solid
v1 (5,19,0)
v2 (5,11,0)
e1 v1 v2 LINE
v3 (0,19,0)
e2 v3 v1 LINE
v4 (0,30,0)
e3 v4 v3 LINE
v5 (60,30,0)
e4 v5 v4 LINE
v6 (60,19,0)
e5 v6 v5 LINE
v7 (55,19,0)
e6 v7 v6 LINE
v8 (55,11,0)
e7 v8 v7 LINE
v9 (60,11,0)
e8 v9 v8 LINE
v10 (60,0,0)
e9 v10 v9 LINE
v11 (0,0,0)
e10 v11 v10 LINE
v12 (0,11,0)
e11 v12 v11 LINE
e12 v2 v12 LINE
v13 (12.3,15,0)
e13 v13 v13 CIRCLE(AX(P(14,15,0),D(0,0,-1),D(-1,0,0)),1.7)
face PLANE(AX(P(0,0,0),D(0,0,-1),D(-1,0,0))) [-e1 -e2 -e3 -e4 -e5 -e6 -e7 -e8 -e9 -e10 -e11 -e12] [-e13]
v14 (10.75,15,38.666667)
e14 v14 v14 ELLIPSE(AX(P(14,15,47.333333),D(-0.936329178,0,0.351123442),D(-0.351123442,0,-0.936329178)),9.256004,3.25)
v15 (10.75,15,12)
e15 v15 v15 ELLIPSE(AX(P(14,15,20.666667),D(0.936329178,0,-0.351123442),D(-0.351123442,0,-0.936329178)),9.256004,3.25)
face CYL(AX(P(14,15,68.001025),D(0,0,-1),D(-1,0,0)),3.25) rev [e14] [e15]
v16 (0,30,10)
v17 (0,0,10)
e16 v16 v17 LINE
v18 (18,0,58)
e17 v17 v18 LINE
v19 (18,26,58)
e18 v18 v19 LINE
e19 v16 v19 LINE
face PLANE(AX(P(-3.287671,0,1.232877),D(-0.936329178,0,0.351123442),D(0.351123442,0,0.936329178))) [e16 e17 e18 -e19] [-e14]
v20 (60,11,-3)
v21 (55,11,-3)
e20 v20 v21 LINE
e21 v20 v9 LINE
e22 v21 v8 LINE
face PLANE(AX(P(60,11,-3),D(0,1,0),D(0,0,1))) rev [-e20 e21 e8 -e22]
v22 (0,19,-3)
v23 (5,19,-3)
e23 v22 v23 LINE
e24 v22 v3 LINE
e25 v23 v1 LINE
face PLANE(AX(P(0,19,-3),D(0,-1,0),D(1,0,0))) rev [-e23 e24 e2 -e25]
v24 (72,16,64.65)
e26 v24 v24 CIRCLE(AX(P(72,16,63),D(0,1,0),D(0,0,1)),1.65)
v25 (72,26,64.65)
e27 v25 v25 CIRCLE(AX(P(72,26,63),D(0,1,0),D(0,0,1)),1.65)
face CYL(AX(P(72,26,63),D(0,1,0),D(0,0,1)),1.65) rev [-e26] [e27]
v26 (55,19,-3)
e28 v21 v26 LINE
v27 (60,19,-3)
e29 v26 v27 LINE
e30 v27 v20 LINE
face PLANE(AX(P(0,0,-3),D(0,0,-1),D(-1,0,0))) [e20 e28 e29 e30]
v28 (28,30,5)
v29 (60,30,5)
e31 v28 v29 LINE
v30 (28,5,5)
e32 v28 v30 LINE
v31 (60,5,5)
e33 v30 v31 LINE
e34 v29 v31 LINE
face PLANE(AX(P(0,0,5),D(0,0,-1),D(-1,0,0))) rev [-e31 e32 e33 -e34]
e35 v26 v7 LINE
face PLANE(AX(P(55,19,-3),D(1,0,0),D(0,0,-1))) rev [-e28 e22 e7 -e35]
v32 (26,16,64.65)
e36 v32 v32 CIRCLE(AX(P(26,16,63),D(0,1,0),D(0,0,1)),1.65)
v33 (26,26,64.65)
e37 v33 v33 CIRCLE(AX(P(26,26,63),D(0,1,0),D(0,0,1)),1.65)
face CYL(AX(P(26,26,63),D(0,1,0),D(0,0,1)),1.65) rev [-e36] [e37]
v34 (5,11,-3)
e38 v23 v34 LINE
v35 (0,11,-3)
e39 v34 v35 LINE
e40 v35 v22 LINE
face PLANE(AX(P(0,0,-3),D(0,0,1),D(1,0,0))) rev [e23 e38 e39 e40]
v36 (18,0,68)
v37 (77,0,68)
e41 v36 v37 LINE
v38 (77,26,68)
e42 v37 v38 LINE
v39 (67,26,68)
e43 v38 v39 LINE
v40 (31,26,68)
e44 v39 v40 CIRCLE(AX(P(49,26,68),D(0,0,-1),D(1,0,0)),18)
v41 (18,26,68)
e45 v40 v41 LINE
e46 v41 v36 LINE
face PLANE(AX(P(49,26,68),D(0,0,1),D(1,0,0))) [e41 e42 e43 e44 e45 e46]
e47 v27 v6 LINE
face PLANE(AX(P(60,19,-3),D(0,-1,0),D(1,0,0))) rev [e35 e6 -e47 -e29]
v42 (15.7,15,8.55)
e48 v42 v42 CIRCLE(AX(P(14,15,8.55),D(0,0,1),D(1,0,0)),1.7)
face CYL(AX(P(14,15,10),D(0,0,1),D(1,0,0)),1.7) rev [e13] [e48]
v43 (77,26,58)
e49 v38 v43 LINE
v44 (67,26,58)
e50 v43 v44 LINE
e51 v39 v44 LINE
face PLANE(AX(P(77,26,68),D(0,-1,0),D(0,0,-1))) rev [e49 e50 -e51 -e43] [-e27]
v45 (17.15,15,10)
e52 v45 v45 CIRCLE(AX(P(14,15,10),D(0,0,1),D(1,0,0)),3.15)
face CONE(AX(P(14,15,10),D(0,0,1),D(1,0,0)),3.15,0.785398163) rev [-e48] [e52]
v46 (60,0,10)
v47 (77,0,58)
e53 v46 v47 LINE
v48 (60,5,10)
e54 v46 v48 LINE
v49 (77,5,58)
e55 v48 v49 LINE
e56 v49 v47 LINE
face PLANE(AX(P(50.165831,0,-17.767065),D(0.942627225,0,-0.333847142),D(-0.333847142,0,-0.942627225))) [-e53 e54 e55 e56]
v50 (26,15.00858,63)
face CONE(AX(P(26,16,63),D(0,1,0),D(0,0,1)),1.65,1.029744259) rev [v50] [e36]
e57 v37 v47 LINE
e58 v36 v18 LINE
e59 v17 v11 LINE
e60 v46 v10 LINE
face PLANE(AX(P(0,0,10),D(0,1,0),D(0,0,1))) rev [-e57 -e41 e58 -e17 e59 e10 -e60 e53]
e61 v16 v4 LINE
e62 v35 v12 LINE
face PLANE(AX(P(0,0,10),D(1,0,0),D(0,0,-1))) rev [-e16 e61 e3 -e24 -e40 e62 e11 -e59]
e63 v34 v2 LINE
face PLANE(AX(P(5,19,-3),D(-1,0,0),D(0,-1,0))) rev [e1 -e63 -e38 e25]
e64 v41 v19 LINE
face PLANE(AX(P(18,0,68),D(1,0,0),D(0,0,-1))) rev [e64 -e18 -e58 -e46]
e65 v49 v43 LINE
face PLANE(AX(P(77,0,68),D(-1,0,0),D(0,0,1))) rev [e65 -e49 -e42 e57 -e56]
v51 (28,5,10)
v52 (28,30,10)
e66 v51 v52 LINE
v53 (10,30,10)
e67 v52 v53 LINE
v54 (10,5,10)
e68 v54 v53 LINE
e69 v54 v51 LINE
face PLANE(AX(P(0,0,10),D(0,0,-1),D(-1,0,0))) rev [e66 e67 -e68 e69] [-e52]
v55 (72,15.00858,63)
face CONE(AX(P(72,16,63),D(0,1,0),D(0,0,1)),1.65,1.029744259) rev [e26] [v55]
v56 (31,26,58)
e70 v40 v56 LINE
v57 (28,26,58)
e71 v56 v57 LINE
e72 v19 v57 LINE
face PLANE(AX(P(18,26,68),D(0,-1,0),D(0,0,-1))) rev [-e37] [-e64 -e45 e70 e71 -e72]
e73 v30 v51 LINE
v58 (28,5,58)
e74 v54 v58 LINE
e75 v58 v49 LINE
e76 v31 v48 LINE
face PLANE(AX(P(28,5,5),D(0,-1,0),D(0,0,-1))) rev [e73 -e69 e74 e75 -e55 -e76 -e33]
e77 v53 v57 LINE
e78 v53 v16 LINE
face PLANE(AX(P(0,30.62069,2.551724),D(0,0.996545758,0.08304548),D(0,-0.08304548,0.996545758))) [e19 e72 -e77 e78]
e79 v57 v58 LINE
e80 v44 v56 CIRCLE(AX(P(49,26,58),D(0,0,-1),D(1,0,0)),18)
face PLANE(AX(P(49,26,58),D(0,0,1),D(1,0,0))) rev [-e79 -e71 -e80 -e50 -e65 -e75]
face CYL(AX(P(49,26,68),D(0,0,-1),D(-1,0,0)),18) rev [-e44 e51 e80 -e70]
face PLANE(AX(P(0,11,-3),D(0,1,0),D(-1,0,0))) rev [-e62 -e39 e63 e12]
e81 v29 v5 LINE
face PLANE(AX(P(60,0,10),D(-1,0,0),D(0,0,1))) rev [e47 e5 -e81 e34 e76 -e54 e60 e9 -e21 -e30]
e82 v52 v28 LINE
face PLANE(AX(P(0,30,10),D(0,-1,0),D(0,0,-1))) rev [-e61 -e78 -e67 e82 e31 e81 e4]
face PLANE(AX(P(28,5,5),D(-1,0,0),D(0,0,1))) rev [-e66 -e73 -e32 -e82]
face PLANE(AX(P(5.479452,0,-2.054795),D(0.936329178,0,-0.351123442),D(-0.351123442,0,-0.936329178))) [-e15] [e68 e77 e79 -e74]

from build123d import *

# Parameters (mm, degrees)
SKETCH_1_W          = 60
SKETCH_1_H          = 30
EXTRUDE_1_DEPTH     = 10
SKETCH_2_W          = 42
SKETCH_2_H          = 42
CUT_EXTRUDE_1_DEPTH = 5
EXTRUDE_2_DEPTH     = 10
CUT_EXTRUDE_2_REACH = 102.96
SKETCH_8_R          = 3.25
SKETCH_9_W          = 5
SKETCH_9_H          = 8
EXTRUDE_3_DEPTH     = 3


# Read off the part's stored shape, not the designer's step: 高级异型孔1, 高级异型孔2
with BuildPart() as part:
    # 草图1 → 凸台-拉伸1 (new body)
    with BuildSketch(Plane.XY):
        with Locations((30, 15)):
            Rectangle(SKETCH_1_W, SKETCH_1_H)
    extrude(amount=EXTRUDE_1_DEPTH)

    # 草图2 → 切除-拉伸1 (cut)
    with BuildSketch(Plane.XY.offset(10)):
        with Locations((49, 26)):
            Rectangle(SKETCH_2_W, SKETCH_2_H)
    extrude(amount=-CUT_EXTRUDE_1_DEPTH, mode=Mode.SUBTRACT)



with BuildPart() as body_2:
    # 草图3 → 凸台-拉伸2 (new body)
    with BuildSketch(Plane.XY.offset(58)):
        with BuildLine():
            Line((18, 0), (18, 26))
            Line((18, 26), (31, 26))
            ThreePointArc((31, 26), (49, 8), (67, 26))
            Line((67, 26), (77, 26))
            Line((77, 26), (77, 0))
            Line((77, 0), (18, 0))
        make_face()
    extrude(amount=EXTRUDE_2_DEPTH)


with BuildPart() as part_1:
    add(part.part)

    add(body_2.part)  # 放样1 merges body 2
    # 草图5 → 放样1 section 0
    with BuildSketch(Plane.XY.offset(10)):
        with BuildLine():
            Line((60, 5), (60, 0))
            Line((60, 0), (0, 0))
            Line((0, 0), (0, 30))
            Line((0, 30), (10, 30))
            Line((10, 30), (10, 5))
            Line((10, 5), (60, 5))
        make_face()
    # 草图4 → 放样1 section 1
    with BuildSketch(Plane(origin=(0, 0, 58), x_dir=(-1, 0, 0), z_dir=(0, 0, -1))):
        with BuildLine():
            Line((-18, 26), (-18, 0))
            Line((-18, 0), (-77, 0))
            Line((-77, 0), (-77, 5))
            Line((-77, 5), (-28, 5))
            Line((-28, 5), (-28, 26))
            Line((-28, 26), (-18, 26))
        make_face()
    loft()

    # 高级异型孔1 outline → 高级异型孔1 (revolve, cut)
    with BuildSketch(Plane(origin=(14, 15, 0), x_dir=(1, 0, 0), z_dir=(0, -1, 0))):
        Polygon((3.15, 10), (0, 10), (0, 0), (1.7, 0), (1.7, 8.55), align=None)
    revolve(axis=Axis((14, 15, 0), (0, 0, 1)), mode=Mode.SUBTRACT)

    # 切除-拉伸2: up to this plane
    cut_extrude_2_end = Plane(origin=(-3.287671233, 0, 1.232876712), z_dir=(-0.9363291775690445, 0, 0.35112344158839154))
    # 草图8 → 切除-拉伸2 (cut, up to the surface)
    with BuildSketch(Plane.XY.offset(10), mode=Mode.PRIVATE) as cut_extrude_2_sk1:
        with Locations(Location((14, 15, 0), (0, 0, 180))):
            Circle(SKETCH_8_R)
    cut_extrude_2_tool1 = split(extrude(cut_extrude_2_sk1.sketch, amount=CUT_EXTRUDE_2_REACH, mode=Mode.PRIVATE), bisect_by=cut_extrude_2_end, keep=Keep.BOTH, mode=Mode.PRIVATE)
    add(cut_extrude_2_tool1.solids().sort_by_distance((14, 15, 10))[0], mode=Mode.SUBTRACT)

    # 草图9 → 凸台-拉伸3 (add)
    with BuildSketch(Plane(origin=(0, 0, 0), x_dir=(-1, 0, 0), z_dir=(0, 0, -1))):
        with Locations((-57.5, 15)):
            Rectangle(SKETCH_9_W, SKETCH_9_H)
        with Locations((-2.5, 15)):
            Rectangle(SKETCH_9_W, SKETCH_9_H)
    extrude(amount=EXTRUDE_3_DEPTH)

    # 高级异型孔2 outline → 高级异型孔2 (revolve, cut)
    with BuildSketch(Plane(origin=(72, 0, 63), x_dir=(1, 0, 0), z_dir=(0, 0, 1))):
        Polygon((0, 15.008579979), (1.65, 16), (1.65, 26), (0, 26), align=None)
    revolve(axis=Axis((72, 0, 63), (0, 1, 0)), mode=Mode.SUBTRACT)

    # Other 2 2 outline → Other 2 2 (revolve, cut)
    with BuildSketch(Plane(origin=(26, 0, 63), x_dir=(1, 0, 0), z_dir=(0, 0, 1))):
        Polygon((0, 15.008579979), (1.65, 16), (1.65, 26), (0, 26), align=None)
    revolve(axis=Axis((26, 0, 63), (0, 1, 0)), mode=Mode.SUBTRACT)


solid = part_1.part
